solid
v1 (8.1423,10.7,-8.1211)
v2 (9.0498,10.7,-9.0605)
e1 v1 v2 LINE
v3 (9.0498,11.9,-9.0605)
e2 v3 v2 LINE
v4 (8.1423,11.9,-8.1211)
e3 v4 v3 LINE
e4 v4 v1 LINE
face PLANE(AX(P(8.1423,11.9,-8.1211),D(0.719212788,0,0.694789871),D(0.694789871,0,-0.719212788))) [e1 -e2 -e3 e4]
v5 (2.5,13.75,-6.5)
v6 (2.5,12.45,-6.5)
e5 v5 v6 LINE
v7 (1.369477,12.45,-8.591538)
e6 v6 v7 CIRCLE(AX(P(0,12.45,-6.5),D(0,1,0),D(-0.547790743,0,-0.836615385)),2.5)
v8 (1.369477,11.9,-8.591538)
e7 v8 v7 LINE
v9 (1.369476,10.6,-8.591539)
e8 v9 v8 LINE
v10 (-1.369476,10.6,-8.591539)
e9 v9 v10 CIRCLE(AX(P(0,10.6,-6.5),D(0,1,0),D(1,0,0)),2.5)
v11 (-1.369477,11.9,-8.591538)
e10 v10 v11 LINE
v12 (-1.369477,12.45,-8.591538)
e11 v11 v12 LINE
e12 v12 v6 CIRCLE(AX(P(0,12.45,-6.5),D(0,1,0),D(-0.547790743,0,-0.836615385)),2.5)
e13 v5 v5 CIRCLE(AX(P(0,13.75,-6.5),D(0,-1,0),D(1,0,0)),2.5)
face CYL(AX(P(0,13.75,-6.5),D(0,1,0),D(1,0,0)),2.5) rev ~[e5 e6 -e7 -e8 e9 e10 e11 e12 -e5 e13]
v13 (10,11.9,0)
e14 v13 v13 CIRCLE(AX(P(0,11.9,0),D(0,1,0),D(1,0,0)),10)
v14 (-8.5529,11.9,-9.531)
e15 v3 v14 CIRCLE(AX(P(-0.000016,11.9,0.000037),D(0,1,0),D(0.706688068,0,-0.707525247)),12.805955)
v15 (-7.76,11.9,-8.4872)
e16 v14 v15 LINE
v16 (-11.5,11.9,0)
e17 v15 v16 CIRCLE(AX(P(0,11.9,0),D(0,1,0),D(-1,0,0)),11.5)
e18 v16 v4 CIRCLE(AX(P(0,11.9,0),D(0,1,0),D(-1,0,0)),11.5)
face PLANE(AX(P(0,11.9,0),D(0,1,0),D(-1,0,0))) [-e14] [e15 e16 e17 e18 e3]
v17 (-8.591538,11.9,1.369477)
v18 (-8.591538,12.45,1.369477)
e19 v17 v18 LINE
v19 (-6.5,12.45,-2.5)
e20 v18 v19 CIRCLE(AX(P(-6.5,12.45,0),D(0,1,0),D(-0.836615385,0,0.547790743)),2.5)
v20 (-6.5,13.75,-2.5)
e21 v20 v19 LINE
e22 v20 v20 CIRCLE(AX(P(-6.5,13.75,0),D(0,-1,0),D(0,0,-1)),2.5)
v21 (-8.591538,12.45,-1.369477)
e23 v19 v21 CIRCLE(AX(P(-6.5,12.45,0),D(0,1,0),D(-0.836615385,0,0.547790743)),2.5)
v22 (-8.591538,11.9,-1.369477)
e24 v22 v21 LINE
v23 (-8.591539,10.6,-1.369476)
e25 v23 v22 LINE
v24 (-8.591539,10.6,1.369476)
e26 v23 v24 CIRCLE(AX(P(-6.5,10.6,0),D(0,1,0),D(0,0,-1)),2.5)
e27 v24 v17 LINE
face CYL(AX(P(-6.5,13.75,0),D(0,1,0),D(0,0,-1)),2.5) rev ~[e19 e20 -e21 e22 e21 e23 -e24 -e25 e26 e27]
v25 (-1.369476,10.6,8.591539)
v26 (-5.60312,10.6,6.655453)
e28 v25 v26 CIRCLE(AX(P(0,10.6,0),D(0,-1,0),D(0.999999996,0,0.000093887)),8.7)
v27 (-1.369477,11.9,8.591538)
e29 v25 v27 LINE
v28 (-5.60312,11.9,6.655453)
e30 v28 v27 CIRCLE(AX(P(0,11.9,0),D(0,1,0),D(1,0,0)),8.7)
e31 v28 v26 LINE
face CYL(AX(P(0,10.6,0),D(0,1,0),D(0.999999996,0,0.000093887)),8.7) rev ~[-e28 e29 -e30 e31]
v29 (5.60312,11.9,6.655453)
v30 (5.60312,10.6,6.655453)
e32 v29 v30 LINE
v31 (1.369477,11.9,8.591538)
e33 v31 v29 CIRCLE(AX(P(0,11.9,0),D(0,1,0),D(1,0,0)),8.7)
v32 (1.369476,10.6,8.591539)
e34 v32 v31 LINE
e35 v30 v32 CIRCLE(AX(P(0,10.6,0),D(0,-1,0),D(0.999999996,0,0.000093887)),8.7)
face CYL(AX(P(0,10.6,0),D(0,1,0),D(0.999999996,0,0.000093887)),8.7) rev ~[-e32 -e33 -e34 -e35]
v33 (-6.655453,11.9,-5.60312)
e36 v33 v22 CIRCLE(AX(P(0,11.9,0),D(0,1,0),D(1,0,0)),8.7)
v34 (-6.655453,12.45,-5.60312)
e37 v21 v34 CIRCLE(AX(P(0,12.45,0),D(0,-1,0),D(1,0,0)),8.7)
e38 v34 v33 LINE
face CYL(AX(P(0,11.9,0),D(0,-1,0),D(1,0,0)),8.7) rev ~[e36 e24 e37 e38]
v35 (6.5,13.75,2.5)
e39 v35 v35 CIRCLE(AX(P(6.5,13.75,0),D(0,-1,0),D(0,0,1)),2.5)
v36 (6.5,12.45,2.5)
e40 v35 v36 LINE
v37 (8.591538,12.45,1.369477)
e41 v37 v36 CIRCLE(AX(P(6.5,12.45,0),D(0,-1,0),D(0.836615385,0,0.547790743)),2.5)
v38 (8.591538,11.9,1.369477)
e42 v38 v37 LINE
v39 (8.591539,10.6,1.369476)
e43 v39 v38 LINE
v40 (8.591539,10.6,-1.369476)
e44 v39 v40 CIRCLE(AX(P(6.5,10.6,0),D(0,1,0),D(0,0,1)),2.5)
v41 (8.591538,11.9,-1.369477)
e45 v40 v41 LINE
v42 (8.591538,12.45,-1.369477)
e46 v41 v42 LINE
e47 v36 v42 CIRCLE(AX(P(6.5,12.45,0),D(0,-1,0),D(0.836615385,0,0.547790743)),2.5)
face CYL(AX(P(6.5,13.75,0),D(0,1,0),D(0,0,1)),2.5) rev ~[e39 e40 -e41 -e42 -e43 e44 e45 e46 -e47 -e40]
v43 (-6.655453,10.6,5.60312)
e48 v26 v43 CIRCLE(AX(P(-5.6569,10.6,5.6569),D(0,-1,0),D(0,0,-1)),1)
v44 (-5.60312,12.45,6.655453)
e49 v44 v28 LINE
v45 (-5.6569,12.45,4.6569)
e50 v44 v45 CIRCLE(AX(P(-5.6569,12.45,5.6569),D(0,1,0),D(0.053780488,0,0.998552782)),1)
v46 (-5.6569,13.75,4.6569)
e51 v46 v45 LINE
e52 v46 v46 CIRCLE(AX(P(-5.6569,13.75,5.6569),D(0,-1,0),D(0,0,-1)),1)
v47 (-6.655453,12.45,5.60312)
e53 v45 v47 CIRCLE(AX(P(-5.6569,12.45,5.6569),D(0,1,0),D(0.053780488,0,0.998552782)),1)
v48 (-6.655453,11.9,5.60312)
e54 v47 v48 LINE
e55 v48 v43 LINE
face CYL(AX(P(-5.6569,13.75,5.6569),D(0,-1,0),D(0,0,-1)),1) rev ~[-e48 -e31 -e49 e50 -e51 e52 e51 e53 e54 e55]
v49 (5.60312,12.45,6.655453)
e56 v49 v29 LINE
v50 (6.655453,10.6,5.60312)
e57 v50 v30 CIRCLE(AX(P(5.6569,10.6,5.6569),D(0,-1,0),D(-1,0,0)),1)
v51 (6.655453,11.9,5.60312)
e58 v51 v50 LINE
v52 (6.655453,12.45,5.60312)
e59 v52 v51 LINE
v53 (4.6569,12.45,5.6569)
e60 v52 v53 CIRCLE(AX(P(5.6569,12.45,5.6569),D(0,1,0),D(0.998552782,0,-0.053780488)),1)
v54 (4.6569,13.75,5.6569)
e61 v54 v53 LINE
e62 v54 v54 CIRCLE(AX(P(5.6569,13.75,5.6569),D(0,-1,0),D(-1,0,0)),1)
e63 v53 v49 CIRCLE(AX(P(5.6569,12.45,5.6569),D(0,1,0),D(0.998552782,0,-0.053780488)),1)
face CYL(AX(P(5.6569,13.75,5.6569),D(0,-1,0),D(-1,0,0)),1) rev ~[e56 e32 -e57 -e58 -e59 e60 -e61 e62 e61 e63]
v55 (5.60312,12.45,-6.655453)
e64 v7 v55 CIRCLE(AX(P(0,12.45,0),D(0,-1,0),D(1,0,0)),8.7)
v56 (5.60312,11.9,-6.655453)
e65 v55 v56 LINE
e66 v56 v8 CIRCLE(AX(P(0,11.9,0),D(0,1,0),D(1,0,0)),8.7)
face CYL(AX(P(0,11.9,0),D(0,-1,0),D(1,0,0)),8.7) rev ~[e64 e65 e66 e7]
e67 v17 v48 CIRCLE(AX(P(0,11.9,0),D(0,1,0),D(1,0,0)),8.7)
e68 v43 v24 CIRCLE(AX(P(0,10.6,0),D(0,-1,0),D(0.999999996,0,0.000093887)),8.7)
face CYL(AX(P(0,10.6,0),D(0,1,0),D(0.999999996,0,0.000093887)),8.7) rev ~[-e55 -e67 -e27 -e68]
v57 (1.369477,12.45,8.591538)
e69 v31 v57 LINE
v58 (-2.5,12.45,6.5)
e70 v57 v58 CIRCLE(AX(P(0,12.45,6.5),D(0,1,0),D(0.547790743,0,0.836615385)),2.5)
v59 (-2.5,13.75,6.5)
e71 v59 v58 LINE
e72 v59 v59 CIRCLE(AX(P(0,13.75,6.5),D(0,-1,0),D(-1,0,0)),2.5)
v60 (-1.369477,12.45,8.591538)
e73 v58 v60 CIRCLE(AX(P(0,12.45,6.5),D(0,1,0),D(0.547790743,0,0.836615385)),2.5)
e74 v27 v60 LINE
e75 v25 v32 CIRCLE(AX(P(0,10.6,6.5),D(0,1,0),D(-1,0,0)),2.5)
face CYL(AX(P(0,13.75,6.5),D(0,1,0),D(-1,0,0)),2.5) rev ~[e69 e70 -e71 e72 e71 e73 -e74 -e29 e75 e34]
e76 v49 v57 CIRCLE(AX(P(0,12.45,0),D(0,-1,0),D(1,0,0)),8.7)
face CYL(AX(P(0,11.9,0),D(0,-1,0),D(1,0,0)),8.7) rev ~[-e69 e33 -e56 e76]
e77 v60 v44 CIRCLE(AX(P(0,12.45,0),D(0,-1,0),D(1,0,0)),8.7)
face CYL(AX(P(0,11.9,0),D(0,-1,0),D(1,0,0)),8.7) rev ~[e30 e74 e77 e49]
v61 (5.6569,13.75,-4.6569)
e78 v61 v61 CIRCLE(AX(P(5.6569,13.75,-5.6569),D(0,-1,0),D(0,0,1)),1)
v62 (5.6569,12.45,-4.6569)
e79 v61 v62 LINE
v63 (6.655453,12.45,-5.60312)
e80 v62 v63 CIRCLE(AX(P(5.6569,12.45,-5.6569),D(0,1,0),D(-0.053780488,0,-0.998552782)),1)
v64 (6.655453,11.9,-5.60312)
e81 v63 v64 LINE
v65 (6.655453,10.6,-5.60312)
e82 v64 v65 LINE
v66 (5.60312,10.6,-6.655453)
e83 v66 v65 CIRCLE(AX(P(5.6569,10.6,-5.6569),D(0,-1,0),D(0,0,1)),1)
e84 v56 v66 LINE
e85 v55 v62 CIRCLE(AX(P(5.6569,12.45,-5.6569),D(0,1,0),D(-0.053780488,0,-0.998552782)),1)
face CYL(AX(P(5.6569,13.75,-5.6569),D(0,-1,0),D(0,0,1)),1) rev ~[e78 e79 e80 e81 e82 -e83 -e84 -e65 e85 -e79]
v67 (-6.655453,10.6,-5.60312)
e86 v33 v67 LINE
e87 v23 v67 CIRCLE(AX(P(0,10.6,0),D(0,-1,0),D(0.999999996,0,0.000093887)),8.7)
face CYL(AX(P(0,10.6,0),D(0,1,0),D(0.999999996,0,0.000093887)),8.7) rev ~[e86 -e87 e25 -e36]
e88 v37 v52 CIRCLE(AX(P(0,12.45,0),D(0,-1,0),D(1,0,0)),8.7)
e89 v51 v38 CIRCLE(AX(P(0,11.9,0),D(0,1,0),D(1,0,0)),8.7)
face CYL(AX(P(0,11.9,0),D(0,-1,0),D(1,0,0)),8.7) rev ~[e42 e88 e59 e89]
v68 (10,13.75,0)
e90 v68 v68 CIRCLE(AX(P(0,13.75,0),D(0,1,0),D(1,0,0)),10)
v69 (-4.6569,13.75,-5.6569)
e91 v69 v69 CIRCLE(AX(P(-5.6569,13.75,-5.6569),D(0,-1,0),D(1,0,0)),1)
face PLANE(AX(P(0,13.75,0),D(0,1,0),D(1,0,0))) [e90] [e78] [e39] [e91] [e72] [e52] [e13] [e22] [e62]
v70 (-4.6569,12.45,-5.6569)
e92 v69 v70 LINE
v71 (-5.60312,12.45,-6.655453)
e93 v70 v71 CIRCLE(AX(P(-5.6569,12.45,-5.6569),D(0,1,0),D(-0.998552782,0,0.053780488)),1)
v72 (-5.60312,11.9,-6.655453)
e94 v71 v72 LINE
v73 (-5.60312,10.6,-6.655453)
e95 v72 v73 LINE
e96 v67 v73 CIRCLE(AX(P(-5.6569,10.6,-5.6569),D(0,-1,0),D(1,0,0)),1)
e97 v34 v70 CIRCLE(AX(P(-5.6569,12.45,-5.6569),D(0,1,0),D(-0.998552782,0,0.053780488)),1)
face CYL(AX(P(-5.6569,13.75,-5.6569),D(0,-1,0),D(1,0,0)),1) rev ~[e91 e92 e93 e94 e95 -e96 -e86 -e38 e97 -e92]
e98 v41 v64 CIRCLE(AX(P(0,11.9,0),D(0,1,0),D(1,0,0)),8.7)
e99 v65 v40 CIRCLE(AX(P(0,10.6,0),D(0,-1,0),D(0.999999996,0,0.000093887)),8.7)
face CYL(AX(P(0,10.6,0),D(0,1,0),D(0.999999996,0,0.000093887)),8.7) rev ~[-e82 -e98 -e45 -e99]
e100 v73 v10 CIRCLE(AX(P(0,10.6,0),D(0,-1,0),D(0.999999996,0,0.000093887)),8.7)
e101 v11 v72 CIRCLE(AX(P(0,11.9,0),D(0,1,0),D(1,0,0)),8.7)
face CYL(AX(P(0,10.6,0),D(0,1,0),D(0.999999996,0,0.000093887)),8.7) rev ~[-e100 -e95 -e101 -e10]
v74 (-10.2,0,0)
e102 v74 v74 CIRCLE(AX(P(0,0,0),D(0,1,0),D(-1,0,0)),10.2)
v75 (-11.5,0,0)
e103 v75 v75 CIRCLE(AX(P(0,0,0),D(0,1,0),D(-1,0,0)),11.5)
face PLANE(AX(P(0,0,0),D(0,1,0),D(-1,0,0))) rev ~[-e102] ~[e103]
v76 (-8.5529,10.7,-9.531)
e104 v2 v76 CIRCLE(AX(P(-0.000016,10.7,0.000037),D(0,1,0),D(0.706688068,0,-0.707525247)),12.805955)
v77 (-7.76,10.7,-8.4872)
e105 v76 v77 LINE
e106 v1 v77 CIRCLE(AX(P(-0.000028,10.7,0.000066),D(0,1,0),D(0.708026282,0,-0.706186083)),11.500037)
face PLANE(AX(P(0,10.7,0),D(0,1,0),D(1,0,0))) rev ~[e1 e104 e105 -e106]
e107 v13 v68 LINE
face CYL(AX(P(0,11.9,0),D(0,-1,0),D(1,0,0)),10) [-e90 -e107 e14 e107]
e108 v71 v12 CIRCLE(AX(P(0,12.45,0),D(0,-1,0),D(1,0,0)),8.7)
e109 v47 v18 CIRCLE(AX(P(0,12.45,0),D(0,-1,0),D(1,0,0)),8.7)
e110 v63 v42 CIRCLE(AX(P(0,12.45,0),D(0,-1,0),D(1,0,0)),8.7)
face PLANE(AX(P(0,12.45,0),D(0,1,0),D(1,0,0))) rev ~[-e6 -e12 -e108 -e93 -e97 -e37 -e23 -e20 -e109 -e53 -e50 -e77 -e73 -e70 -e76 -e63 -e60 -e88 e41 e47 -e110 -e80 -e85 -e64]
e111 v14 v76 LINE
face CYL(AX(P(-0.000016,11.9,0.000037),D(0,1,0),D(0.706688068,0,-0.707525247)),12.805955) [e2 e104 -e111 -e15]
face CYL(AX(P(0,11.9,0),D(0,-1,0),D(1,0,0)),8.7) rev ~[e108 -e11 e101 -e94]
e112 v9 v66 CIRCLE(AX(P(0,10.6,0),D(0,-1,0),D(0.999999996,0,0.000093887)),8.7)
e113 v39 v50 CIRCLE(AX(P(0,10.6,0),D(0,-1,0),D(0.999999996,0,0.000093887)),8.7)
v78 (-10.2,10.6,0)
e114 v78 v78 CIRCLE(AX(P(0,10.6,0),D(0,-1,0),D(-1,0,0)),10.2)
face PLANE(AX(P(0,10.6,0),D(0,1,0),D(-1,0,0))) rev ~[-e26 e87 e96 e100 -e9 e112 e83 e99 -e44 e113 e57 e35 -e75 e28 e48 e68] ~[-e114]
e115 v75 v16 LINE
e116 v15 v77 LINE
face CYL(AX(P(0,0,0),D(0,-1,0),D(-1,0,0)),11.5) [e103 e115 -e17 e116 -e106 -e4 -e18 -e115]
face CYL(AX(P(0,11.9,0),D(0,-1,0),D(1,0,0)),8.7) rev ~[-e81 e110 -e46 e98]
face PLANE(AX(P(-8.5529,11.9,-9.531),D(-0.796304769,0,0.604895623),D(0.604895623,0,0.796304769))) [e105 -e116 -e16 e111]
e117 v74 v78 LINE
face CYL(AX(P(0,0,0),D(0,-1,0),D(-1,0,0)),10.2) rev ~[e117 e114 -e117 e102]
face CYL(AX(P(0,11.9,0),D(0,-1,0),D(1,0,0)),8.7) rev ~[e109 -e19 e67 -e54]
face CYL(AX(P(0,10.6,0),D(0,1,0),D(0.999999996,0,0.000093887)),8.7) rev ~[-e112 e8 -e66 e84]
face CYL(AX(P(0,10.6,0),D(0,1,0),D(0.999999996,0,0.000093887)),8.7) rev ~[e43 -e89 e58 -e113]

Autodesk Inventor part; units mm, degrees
ref_plane "XZ Plane" through (0, 0, 0) normal (0, 1, 0) x (-1, 0, 0)
sketch "Sketch1" plane through (0, 0, 0) normal (0, 1, 0) x (-1, 0, 0)
  circle A0 centre (0, 0) radius 11.5
  dimension "d0" = 23
extrude "Extrusion1" add sketch "Sketch1" along normal blind 11.9
sketch "Sketch2" plane through (0, 11.9, 0) normal (0, 1, 0) x (1, 0, 0)
  circle A0 centre (0, 0) radius 10
  dimension "d3" = 20
extrude "Extrusion2" add sketch "Sketch2" along normal blind 1.85
sketch "Sketch3" plane through (0, 13.75, 0) normal (0, 1, 0) x (1, 0, 0)
  circle A0 centre (0, 0) radius 10 projected
  circle A1 centre (0, 6.5) radius 2.5
  dimension "d6" = 5
  dimension "d23" = 6.5
extrude "Extrusion3" cut sketch "Sketch3" against normal blind 5 contours A1
ref_plane "Work Plane1" through (0, 0, 0) normal (0.7071068, 0, 0.7071068) x (0, 1, 0)
sketch "Sketch4" plane through (0, 13.75, 0) normal (0, 1, 0) x (1, 0, 0)
  line L0 (16.1, 16.1) -> (-16.1, -16.1) projected
  point P0 (0, 0)
  point P1 (5.6569, 5.6569)
  dimension "d10" = 8
hole "Hole1" at (5.6569, 13.75, -5.6569) direction (0, -1, 0) diameter 2 depth 4.5 tip angle 118
pattern_circular "Circular Pattern1" count 4 over 360 about axis through (0, -10, 0) along (0, 1, 0) of "Extrusion3", "Hole1"
shell "Shell1" thickness 1.3 removed faces 17 at (-0.1507, 0, 2.542) at (-0.852, 8.75, -7.0526) at (6.099, 10.4167, 2.4676) at (7.0526, 8.75, -0.852) at (2.4676, 10.4167, -6.099) at (5.7373, 12.25, -4.6601) at (5.843, 9.1165, -4.9017) at (6.3455, 9.1165, 6.0183) at (4.6601, 12.25, 5.7373) at (0.852, 8.75, 7.0526) at (-2.4676, 10.4167, 6.099) at (-7.0526, 8.75, 0.852) at (-6.099, 10.4167, -2.4676) at (-5.843, 9.1165, 4.9017) at (-5.7373, 12.25, 4.6601) at (-4.9017, 9.1165, -5.843) at (-4.6601, 12.25, -5.7373)
sketch "Sketch5" plane through (0, 11.9, 0) normal (0, 1, 0) x (1, 0, 0)
  arc A0 (9.0498, 9.0605) -> (-8.5529, 9.531) centre (0, 0) ccw
  arc A1 (8.1423, 8.1211) -> (-7.76, 8.4872) centre (0, 0) ccw
  line L0 (-8.5529, 9.531) -> (-7.76, 8.4872)
  line L1 (8.1423, 8.1211) -> (9.0498, 9.0605)
extrude "Extrusion4" add sketch "Sketch5" against normal blind 1.2
properties part number "motor_GM1806-80T_SkyproRO_stator" material "Iron, Cast"
